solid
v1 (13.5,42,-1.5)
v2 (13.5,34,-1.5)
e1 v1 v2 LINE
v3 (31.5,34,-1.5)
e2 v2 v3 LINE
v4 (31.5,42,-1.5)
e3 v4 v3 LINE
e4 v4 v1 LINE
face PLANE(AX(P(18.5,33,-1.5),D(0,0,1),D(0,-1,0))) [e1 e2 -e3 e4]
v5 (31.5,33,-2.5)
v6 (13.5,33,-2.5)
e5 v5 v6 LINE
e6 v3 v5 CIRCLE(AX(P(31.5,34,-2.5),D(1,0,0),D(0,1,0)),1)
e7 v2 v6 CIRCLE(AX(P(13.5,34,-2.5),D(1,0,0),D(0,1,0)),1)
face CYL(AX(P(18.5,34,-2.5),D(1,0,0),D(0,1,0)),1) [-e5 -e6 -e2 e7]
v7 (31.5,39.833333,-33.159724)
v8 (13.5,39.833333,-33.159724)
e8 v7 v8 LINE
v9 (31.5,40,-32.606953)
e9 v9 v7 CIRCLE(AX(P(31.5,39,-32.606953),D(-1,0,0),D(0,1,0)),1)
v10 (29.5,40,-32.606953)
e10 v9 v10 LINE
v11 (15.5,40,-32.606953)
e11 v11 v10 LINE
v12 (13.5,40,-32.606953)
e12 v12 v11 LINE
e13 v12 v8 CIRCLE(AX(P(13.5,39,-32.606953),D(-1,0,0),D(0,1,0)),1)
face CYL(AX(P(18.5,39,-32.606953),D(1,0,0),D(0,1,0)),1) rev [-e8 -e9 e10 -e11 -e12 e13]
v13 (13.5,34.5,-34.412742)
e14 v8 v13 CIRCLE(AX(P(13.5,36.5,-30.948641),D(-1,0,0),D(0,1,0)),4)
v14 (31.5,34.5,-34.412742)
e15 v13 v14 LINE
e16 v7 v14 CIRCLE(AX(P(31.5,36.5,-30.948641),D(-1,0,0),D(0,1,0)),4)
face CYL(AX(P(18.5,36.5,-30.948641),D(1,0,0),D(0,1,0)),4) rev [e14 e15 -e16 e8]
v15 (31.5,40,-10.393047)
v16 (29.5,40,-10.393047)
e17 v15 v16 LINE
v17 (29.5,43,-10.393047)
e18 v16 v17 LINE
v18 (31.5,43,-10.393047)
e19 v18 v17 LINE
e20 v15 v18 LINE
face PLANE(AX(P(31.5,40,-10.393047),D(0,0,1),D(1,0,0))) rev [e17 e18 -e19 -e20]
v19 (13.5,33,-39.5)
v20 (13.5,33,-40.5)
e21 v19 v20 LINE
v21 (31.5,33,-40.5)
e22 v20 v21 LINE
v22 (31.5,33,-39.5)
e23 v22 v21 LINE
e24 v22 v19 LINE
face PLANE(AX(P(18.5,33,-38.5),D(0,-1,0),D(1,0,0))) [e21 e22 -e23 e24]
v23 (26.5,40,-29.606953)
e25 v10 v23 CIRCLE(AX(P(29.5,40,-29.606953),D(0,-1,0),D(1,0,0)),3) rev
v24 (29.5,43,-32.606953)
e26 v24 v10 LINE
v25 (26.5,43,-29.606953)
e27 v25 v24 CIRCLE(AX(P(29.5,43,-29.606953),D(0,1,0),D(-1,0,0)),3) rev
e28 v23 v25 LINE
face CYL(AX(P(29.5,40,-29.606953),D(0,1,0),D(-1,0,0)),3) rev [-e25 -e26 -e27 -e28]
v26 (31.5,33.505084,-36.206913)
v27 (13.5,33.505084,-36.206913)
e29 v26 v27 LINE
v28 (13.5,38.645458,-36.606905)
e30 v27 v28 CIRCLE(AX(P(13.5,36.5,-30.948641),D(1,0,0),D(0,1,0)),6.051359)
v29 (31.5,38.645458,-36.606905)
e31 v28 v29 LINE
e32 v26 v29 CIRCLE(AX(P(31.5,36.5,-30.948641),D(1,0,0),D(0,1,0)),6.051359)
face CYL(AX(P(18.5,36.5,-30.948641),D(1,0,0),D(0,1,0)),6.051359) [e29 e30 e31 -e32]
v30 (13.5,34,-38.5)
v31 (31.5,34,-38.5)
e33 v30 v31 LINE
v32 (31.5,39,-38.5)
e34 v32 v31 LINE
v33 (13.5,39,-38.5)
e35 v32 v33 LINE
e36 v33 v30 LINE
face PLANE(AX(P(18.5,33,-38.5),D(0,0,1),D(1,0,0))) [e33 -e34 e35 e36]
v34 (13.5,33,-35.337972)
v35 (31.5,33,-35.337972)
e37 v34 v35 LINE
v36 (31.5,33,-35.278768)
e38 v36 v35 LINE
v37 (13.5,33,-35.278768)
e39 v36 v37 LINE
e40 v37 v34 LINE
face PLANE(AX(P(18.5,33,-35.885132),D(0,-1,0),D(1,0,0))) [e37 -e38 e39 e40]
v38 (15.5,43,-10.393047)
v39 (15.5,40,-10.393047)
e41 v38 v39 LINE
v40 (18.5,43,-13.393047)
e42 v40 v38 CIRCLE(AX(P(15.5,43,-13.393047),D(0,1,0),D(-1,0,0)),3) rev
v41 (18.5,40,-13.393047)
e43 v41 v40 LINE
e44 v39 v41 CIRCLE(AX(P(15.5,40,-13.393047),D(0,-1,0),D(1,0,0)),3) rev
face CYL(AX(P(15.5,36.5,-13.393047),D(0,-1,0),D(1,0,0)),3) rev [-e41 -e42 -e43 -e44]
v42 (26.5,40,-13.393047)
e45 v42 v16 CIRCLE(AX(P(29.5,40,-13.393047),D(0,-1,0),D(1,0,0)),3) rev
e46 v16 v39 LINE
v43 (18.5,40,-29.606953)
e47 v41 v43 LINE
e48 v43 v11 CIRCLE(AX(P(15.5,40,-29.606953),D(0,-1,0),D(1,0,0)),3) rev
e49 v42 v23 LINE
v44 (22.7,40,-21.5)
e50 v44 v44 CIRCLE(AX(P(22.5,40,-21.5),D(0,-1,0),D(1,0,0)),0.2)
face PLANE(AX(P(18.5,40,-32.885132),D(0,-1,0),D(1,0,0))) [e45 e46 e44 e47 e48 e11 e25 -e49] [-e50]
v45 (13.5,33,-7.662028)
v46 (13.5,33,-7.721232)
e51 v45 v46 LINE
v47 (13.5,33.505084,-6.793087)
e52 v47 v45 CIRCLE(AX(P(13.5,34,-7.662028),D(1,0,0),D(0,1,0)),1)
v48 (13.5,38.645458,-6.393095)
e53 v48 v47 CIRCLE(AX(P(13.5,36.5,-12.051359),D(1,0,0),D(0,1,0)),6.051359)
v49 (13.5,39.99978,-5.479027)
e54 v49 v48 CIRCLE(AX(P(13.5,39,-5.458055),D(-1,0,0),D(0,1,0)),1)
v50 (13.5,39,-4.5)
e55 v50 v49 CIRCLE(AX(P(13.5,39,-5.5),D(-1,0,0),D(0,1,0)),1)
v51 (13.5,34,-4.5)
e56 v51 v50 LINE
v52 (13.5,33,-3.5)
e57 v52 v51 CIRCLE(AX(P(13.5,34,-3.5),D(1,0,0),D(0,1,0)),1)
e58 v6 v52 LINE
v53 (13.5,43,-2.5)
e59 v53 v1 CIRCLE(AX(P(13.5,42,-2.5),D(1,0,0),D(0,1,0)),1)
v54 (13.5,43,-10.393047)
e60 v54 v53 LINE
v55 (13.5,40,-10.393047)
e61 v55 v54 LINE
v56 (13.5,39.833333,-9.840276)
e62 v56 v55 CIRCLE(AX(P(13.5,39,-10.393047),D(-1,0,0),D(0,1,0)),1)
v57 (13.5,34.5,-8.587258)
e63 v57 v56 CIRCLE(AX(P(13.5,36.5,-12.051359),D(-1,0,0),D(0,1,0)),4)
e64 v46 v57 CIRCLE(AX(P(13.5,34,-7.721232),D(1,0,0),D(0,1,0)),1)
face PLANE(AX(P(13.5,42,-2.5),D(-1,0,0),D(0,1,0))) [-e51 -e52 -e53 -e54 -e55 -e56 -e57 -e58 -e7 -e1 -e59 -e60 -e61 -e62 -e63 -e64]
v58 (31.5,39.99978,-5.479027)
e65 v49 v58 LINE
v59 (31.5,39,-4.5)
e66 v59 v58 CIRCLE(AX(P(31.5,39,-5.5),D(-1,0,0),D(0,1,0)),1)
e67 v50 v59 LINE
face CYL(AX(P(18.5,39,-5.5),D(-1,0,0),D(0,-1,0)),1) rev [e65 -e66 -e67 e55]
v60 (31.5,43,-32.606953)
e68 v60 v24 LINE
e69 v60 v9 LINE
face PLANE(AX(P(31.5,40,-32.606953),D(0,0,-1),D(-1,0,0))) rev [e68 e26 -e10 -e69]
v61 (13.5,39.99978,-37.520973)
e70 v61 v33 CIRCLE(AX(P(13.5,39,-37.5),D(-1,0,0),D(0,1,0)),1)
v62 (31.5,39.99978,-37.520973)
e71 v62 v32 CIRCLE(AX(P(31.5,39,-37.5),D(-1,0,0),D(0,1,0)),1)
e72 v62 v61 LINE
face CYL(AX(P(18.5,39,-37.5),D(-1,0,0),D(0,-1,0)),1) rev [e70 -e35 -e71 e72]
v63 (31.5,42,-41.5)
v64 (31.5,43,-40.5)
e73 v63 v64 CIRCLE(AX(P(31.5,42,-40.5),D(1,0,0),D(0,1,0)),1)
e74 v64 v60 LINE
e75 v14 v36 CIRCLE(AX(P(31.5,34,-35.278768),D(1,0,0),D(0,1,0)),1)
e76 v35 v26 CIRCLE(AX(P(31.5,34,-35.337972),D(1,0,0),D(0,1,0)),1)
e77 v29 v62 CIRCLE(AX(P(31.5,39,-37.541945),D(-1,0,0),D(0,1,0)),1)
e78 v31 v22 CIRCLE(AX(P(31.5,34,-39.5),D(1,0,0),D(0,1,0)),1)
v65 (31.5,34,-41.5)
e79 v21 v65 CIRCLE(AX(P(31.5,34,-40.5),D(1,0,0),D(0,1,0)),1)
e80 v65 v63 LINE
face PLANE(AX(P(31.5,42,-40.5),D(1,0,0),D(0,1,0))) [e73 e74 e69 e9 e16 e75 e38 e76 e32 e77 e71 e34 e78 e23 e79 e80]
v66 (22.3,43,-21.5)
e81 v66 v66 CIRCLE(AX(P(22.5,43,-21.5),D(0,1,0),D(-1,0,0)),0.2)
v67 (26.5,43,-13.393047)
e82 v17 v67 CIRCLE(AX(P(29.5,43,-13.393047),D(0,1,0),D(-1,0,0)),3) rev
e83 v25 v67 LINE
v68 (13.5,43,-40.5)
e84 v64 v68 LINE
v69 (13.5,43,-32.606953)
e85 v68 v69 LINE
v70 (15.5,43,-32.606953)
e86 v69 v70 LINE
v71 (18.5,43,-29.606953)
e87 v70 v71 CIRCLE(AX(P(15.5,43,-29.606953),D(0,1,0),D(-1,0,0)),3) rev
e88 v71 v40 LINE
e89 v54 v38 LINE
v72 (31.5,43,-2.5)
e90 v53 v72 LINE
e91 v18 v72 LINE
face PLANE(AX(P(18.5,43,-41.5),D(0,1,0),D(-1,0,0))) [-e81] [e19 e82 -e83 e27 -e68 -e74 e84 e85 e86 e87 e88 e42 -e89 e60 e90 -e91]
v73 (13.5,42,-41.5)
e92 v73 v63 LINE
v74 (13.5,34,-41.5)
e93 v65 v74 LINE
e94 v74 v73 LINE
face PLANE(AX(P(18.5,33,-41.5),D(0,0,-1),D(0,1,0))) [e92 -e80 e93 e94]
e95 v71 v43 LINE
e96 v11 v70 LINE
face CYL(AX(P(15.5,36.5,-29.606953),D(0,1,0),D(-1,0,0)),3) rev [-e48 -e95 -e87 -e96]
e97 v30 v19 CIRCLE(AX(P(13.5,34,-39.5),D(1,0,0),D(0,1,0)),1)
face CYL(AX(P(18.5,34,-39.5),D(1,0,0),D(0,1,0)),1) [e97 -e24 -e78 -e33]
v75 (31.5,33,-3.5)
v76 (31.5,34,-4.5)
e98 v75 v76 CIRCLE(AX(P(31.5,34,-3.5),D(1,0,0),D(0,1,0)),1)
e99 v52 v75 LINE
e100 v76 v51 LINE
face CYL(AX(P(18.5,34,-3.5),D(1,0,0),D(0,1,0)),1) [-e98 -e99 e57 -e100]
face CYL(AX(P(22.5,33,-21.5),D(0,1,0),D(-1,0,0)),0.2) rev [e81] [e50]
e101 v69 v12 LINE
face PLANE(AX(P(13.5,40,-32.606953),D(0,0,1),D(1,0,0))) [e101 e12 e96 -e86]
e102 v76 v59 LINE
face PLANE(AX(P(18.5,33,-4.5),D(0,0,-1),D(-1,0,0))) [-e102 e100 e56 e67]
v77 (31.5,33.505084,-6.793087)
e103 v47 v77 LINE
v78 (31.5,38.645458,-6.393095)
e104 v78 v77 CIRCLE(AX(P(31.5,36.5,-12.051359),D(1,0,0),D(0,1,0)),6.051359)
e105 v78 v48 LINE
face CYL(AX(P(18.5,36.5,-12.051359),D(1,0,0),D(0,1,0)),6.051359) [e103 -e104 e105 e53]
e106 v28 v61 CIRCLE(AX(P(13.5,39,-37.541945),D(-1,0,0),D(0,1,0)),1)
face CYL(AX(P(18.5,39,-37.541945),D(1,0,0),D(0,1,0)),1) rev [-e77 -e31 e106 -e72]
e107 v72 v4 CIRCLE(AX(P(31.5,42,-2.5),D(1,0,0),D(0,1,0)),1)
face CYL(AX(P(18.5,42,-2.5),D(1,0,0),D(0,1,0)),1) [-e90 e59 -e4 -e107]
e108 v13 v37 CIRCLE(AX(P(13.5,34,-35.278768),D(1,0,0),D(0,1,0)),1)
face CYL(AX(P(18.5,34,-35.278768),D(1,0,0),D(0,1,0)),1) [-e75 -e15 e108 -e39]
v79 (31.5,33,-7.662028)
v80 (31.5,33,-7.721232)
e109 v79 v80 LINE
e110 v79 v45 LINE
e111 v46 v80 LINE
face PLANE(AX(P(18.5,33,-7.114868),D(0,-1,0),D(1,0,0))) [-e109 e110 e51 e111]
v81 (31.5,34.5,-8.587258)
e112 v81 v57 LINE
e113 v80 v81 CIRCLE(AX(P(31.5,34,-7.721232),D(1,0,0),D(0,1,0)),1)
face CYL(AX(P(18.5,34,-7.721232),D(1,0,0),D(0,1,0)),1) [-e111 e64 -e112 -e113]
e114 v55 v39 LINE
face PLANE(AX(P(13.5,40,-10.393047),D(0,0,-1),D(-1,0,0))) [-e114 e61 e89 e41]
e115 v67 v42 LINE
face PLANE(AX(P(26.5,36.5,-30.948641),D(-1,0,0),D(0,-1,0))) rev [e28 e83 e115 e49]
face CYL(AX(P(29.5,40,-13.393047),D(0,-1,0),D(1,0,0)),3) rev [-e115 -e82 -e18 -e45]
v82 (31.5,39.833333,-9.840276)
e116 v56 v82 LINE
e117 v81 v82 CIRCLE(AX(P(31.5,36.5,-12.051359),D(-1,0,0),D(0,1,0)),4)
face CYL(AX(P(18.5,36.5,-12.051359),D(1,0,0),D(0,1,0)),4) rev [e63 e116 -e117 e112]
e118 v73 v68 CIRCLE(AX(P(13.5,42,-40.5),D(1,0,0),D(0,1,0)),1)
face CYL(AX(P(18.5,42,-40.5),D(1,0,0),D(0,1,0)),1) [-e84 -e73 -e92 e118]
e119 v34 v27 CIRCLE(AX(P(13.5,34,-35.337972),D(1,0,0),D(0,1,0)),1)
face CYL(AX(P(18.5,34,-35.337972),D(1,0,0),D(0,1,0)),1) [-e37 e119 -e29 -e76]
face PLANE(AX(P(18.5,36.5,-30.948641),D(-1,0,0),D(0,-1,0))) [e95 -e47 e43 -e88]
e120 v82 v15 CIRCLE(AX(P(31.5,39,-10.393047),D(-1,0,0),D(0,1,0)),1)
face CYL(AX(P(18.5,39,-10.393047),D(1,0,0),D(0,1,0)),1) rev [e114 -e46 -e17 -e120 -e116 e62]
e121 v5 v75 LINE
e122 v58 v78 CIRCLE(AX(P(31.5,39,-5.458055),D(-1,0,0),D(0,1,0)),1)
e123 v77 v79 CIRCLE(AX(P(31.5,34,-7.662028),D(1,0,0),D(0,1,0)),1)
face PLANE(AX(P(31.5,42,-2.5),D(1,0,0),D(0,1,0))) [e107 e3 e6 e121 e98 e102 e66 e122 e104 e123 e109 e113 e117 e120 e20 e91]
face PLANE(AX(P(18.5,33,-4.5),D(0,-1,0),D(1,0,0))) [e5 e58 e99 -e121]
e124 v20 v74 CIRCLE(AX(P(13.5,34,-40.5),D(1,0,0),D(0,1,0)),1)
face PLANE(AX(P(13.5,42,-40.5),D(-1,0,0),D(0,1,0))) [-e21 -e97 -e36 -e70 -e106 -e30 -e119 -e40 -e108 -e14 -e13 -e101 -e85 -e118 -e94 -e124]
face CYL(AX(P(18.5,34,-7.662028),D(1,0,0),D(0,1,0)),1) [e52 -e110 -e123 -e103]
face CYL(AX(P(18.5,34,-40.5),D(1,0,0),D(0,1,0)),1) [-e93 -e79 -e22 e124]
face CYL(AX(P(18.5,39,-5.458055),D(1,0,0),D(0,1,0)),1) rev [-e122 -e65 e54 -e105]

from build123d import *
from build123d.topology import SkipClean

# Parameters (mm, degrees)
EXTRUDE_1_DEPTH      = 4
EXTRUDE_1_DEPTH_BACK = 4
FILLET_4_R           = 1
EXTRUDE_2_DEPTH      = 5
FILLET_5_R           = 3
SKETCH_5_R           = 0.2
CUT_EXTRUDE_1_DEPTH  = 54.051861419


with BuildPart() as part:
    # Эскиз1 → Бобышка-Вытянуть1 (new, two sides: drawn at the far end of the back side and taken through both)
    with BuildSketch(Plane(origin=(22.5, -18, -41), x_dir=(0, -1, 0), z_dir=(1, 0, 0)).offset(-EXTRUDE_1_DEPTH_BACK)):
        with BuildLine():
            Line((-51, -2.5), (-51, 0.5))
            Line((-51, 0.5), (-61, 0.5))
            Line((-61, 0.5), (-61, -39.5))
            Line((-61, -39.5), (-51, -39.5))
            Line((-51, -39.5), (-51, -36.5))
            Line((-51, -36.5), (-58, -36.5))
            Line((-58, -36.5), (-58, -33.885132318))
            ThreePointArc((-58, -33.885132318), (-54.5, -35), (-51, -33.885132318))
            Line((-51, -33.885132318), (-51, -30.885132318))
            ThreePointArc((-51, -30.885132318), (-54.5, -32.948640645), (-58, -30.885132318))
            Line((-58, -30.885132318), (-58, -8.114867682))
            ThreePointArc((-58, -8.114867682), (-54.5, -6.051359355), (-51, -8.114867682))
            Line((-51, -8.114867682), (-51, -5.114867682))
            ThreePointArc((-51, -5.114867682), (-54.5, -4), (-58, -5.114867682))
            Line((-58, -5.114867682), (-58, -2.5))
            Line((-58, -2.5), (-51, -2.5))
        make_face()
    extrude(amount=EXTRUDE_1_DEPTH + EXTRUDE_1_DEPTH_BACK)

    # Скругление4
    # the kernel refuses this fillet: 1 mm, written as the material it adds along each edge
    with BuildSketch(Plane(origin=(26.5, 40, -38.5), x_dir=(0, 0, 1), z_dir=(-1, 0, 0)), Plane(origin=(18.5, 40, -4.5), x_dir=(0, 0, -1), z_dir=(1, 0, 0))) as fillet_4_piece_1:
        with BuildLine():
            CenterArc((FILLET_4_R, -FILLET_4_R), FILLET_4_R, 90, 90)
            Line((0, -FILLET_4_R), (0, 0))
            Line((0, 0), (FILLET_4_R, 0))
        make_face()
    extrude(amount=8)
    with BuildSketch(Plane(origin=(26.5, 40, -35.885132318), x_dir=(0, 0, -1), z_dir=(-1, 0, 0))) as fillet_4_piece_2:
        with BuildLine():
            CenterArc((1.65681317, 1), FILLET_4_R, 159.234649254, 110.765350746)
            ThreePointArc((0.721772915, 1.354541568), (0.404005567, 0.654294593), (0, 0))
            Line((0, 0), (1.65681317, 0))
        make_face()
    extrude(amount=8)
    with BuildSketch(Plane(origin=(18.5, 40, -32.885132318), x_dir=(0, -0.5188652741265531, -0.8548560272382577), z_dir=(1, 0, 0))) as fillet_4_piece_3:
        with BuildLine():
            CenterArc((0.281062042, -0.999193595), FILLET_4_R, 87.698857305, 33.557309762)
            Line((-0.237803232, -0.144337567), (0, 0))
            ThreePointArc((0, 0), (0.160606881, 0.003225622), (0.321213762, 0))
        make_face()
    extrude(amount=8)
    with BuildSketch(Plane(origin=(18.5, 40, -10.114867682), x_dir=(0, 0, -1), z_dir=(1, 0, 0))) as fillet_4_piece_4:
        with BuildLine():
            CenterArc((0.278179278, -1), FILLET_4_R, 90, 33.557309762)
            ThreePointArc((-0.27459152, -0.166666667), (-0.138969423, -0.080575891), (0, 0))
            Line((0, 0), (0.278179278, 0))
        make_face()
    extrude(amount=8)
    with BuildSketch(Plane(origin=(18.5, 40, -7.114867682), x_dir=(0, -0.8825285241752726, 0.4702588691529541), z_dir=(1, 0, 0))) as fillet_4_piece_5:
        with BuildLine():
            CenterArc((1.661659612, -0.991926012), FILLET_4_R, 97.285750856, 110.765350746)
            Line((0.779131087, -1.462184881), (0, 0))
            ThreePointArc((0, 0), (0.767420843, -0.048858602), (1.534841686, 0))
        make_face()
    extrude(amount=8)
    # the kernel refuses this fillet: 1 mm, written as the material it takes off along each edge
    with BuildSketch(Plane(origin=(17.002810413, 33, -35.885132318), x_dir=(0, 0, 1), z_dir=(1, 0, 0))) as fillet_4_2_piece_1:
        with BuildLine():
            CenterArc((0.547160138, -1), FILLET_4_R, 90, 60.33576985)
            ThreePointArc((-0.321780523, -0.505083716), (-0.167142324, -0.248558772), (0, 0))
            Line((0, 0), (0.547160138, 0))
        make_face()
    extrude(amount=10.994379174, mode=Mode.SUBTRACT)
    with BuildSketch(Plane(origin=(12.515911635, 33, -32.885132318), x_dir=(0, 0.7006292692220382, -0.7135254915624197), z_dir=(1, 0, 0))) as fillet_4_2_piece_2:
        with BuildLine():
            CenterArc((2.408549106, -0.963525492), FILLET_4_R, 105.522487814, 120)
            Line((1.707919837, -1.677050983), (0, 0))
            ThreePointArc((0, 0), (1.070466269, -0.145898034), (2.140932539, 0))
        make_face()
    extrude(amount=19.968176729, mode=Mode.SUBTRACT)
    with BuildSketch(Plane(origin=(12.515911635, 33, -10.114867682), x_dir=(0, 0, 1), z_dir=(1, 0, 0))) as fillet_4_2_piece_3:
        with BuildLine():
            CenterArc((2.393635346, -1), FILLET_4_R, 90, 120)
            ThreePointArc((1.527609942, -1.5), (0.866025404, -0.645898034), (0, 0))
            Line((0, 0), (2.393635346, 0))
        make_face()
    extrude(amount=19.968176729, mode=Mode.SUBTRACT)
    with BuildSketch(Plane(origin=(17.002810413, 33, -7.114867682), x_dir=(0, 0.8433863696195878, 0.5373075762911708), z_dir=(1, 0, 0))) as fillet_4_2_piece_4:
        with BuildLine():
            CenterArc((0.549393082, -0.998774978), FILLET_4_R, 87.163688846, 60.33576985)
            Line((-0.293993287, -0.461467402), (0, 0))
            ThreePointArc((0, 0), (0.299437917, 0.007413047), (0.598875835, 0))
        make_face()
    extrude(amount=10.994379174, mode=Mode.SUBTRACT)
    with BuildSketch(Plane(origin=(16, 33, -4.5), x_dir=(0, 0, 1), z_dir=(1, 0, 0)), Plane(origin=(16, 33, -1.5), x_dir=(0, 1, 0), z_dir=(1, 0, 0)), Plane(origin=(16, 43, -1.5), x_dir=(0, 0, -1), z_dir=(1, 0, 0)), Plane(origin=(16, 43, -41.5), x_dir=(0, -1, 0), z_dir=(1, 0, 0)), Plane(origin=(16, 33, -41.5), x_dir=(0, 0, 1), z_dir=(1, 0, 0)), Plane(origin=(29, 33, -38.5), x_dir=(0, 0, -1), z_dir=(-1, 0, 0))) as fillet_4_2_piece_5:
        with BuildLine():
            CenterArc((FILLET_4_R, -FILLET_4_R), FILLET_4_R, 90, 90)
            Line((0, -FILLET_4_R), (0, 0))
            Line((0, 0), (FILLET_4_R, 0))
        make_face()
    extrude(amount=13, mode=Mode.SUBTRACT)

    # Эскиз3 → Бобышка-Вытянуть2 (add)
    with SkipClean():  # the faces are left unmerged after this step: merging them gives an invalid solid
        with BuildSketch(Plane(origin=(26.5, 0, 0), x_dir=(0, 0, -1), z_dir=(1, 0, 0))):
            with BuildLine():
                Line((10.393046959, 40), (10.393046959, 43))
                Line((10.393046959, 43), (2.5, 43))
                ThreePointArc((2.5, 43), (1.792893219, 42.707106781), (1.5, 42))
                Line((1.5, 42), (1.5, 34))
                ThreePointArc((1.5, 34), (1.792893219, 33.292893219), (2.5, 33))
                Line((2.5, 33), (3.5, 33))
                ThreePointArc((3.5, 33), (4.207106781, 33.292893219), (4.5, 34))
                Line((4.5, 34), (4.5, 39))
                ThreePointArc((4.5, 39), (4.78551671, 39.699652505), (5.479027256, 39.999780048))
                ThreePointArc((5.479027256, 39.999780048), (6.286931447, 39.559430985), (6.393094766, 38.645458432))
                ThreePointArc((6.393094766, 38.645458432), (6.0182377, 36.030539524), (6.793087158, 33.505083716))
                ThreePointArc((6.793087158, 33.505083716), (7.159492389, 33.135443384), (7.662027819, 33))
                Line((7.662027819, 33), (7.721232336, 33))
                ThreePointArc((7.721232336, 33), (8.587257739, 33.5), (8.587257739, 34.5))
                ThreePointArc((8.587257739, 34.5), (8.157384295, 37.414854216), (9.840276161, 39.833333333))
                ThreePointArc((9.840276161, 39.833333333), (10.104371825, 39.957427108), (10.393046959, 40))
            make_face()
            with BuildLine():
                Line((32.606953041, 40), (32.606953041, 43))
                Line((32.606953041, 43), (40.5, 43))
                ThreePointArc((40.5, 43), (41.207106781, 42.707106781), (41.5, 42))
                Line((41.5, 42), (41.5, 34))
                ThreePointArc((41.5, 34), (41.207106781, 33.292893219), (40.5, 33))
                Line((40.5, 33), (39.5, 33))
                ThreePointArc((39.5, 33), (38.792893219, 33.292893219), (38.5, 34))
                Line((38.5, 34), (38.5, 39))
                ThreePointArc((38.5, 39), (38.21448329, 39.699652505), (37.520972744, 39.999780048))
                ThreePointArc((37.520972744, 39.999780048), (36.713068553, 39.559430985), (36.606905234, 38.645458432))
                ThreePointArc((36.606905234, 38.645458432), (36.9817623, 36.030539524), (36.206912842, 33.505083716))
                ThreePointArc((36.206912842, 33.505083716), (35.840507611, 33.135443384), (35.337972181, 33))
                Line((35.337972181, 33), (35.278767664, 33))
                ThreePointArc((35.278767664, 33), (34.412742261, 33.5), (34.412742261, 34.5))
                ThreePointArc((34.412742261, 34.5), (34.842615705, 37.414854216), (33.159723839, 39.833333333))
                ThreePointArc((33.159723839, 39.833333333), (32.895628175, 39.957427108), (32.606953041, 40))
            make_face()
        extrude_2 = extrude(amount=EXTRUDE_2_DEPTH)

    # Зеркальное отражение1: Бобышка-Вытянуть2 across plane
    with SkipClean():  # the faces are left unmerged after this step: merging them gives an invalid solid
        add(extrude_2.mirror(Plane(origin=(22.5, 0, 0), x_dir=(0, 0, 1), z_dir=(1, 0, 0))))

    # Скругление5
    # the kernel refuses this fillet: 3 mm, written as the material it adds along each edge
    with BuildSketch(Plane(origin=(26.5, 40, -32.606953041), x_dir=(0, 0, 1), z_dir=(0, 1, 0)), Plane(origin=(26.5, 40, -10.393046959), x_dir=(1, 0, 0), z_dir=(0, 1, 0))) as fillet_5_piece_1:
        with BuildLine():
            CenterArc((FILLET_5_R, FILLET_5_R), FILLET_5_R, 180, 90)
            Line((0, FILLET_5_R), (0, 0))
            Line((0, 0), (FILLET_5_R, 0))
        make_face()
    extrude(amount=3)
    with BuildSketch(Plane(origin=(18.5, 40, -32.606953041), x_dir=(0, 0, 1), z_dir=(0, 1, 0)), Plane(origin=(18.5, 40, -10.393046959), x_dir=(-1, 0, 0), z_dir=(0, 1, 0))) as fillet_5_piece_2:
        with BuildLine():
            CenterArc((FILLET_5_R, -FILLET_5_R), FILLET_5_R, 90, 90)
            Line((0, -FILLET_5_R), (0, 0))
            Line((0, 0), (FILLET_5_R, 0))
        make_face()
    extrude(amount=3)

    # Эскиз5 → Вырез-Вытянуть1 (cut, through all)
    with BuildSketch(Plane(origin=(0, 43, 0), x_dir=(1, 0, 0), z_dir=(0, 1, 0))):
        with Locations(Location((22.5, 21.5, 0), (0, 0, 180))):
            Circle(SKETCH_5_R)
    extrude(amount=-CUT_EXTRUDE_1_DEPTH, mode=Mode.SUBTRACT)


solid = part.part
